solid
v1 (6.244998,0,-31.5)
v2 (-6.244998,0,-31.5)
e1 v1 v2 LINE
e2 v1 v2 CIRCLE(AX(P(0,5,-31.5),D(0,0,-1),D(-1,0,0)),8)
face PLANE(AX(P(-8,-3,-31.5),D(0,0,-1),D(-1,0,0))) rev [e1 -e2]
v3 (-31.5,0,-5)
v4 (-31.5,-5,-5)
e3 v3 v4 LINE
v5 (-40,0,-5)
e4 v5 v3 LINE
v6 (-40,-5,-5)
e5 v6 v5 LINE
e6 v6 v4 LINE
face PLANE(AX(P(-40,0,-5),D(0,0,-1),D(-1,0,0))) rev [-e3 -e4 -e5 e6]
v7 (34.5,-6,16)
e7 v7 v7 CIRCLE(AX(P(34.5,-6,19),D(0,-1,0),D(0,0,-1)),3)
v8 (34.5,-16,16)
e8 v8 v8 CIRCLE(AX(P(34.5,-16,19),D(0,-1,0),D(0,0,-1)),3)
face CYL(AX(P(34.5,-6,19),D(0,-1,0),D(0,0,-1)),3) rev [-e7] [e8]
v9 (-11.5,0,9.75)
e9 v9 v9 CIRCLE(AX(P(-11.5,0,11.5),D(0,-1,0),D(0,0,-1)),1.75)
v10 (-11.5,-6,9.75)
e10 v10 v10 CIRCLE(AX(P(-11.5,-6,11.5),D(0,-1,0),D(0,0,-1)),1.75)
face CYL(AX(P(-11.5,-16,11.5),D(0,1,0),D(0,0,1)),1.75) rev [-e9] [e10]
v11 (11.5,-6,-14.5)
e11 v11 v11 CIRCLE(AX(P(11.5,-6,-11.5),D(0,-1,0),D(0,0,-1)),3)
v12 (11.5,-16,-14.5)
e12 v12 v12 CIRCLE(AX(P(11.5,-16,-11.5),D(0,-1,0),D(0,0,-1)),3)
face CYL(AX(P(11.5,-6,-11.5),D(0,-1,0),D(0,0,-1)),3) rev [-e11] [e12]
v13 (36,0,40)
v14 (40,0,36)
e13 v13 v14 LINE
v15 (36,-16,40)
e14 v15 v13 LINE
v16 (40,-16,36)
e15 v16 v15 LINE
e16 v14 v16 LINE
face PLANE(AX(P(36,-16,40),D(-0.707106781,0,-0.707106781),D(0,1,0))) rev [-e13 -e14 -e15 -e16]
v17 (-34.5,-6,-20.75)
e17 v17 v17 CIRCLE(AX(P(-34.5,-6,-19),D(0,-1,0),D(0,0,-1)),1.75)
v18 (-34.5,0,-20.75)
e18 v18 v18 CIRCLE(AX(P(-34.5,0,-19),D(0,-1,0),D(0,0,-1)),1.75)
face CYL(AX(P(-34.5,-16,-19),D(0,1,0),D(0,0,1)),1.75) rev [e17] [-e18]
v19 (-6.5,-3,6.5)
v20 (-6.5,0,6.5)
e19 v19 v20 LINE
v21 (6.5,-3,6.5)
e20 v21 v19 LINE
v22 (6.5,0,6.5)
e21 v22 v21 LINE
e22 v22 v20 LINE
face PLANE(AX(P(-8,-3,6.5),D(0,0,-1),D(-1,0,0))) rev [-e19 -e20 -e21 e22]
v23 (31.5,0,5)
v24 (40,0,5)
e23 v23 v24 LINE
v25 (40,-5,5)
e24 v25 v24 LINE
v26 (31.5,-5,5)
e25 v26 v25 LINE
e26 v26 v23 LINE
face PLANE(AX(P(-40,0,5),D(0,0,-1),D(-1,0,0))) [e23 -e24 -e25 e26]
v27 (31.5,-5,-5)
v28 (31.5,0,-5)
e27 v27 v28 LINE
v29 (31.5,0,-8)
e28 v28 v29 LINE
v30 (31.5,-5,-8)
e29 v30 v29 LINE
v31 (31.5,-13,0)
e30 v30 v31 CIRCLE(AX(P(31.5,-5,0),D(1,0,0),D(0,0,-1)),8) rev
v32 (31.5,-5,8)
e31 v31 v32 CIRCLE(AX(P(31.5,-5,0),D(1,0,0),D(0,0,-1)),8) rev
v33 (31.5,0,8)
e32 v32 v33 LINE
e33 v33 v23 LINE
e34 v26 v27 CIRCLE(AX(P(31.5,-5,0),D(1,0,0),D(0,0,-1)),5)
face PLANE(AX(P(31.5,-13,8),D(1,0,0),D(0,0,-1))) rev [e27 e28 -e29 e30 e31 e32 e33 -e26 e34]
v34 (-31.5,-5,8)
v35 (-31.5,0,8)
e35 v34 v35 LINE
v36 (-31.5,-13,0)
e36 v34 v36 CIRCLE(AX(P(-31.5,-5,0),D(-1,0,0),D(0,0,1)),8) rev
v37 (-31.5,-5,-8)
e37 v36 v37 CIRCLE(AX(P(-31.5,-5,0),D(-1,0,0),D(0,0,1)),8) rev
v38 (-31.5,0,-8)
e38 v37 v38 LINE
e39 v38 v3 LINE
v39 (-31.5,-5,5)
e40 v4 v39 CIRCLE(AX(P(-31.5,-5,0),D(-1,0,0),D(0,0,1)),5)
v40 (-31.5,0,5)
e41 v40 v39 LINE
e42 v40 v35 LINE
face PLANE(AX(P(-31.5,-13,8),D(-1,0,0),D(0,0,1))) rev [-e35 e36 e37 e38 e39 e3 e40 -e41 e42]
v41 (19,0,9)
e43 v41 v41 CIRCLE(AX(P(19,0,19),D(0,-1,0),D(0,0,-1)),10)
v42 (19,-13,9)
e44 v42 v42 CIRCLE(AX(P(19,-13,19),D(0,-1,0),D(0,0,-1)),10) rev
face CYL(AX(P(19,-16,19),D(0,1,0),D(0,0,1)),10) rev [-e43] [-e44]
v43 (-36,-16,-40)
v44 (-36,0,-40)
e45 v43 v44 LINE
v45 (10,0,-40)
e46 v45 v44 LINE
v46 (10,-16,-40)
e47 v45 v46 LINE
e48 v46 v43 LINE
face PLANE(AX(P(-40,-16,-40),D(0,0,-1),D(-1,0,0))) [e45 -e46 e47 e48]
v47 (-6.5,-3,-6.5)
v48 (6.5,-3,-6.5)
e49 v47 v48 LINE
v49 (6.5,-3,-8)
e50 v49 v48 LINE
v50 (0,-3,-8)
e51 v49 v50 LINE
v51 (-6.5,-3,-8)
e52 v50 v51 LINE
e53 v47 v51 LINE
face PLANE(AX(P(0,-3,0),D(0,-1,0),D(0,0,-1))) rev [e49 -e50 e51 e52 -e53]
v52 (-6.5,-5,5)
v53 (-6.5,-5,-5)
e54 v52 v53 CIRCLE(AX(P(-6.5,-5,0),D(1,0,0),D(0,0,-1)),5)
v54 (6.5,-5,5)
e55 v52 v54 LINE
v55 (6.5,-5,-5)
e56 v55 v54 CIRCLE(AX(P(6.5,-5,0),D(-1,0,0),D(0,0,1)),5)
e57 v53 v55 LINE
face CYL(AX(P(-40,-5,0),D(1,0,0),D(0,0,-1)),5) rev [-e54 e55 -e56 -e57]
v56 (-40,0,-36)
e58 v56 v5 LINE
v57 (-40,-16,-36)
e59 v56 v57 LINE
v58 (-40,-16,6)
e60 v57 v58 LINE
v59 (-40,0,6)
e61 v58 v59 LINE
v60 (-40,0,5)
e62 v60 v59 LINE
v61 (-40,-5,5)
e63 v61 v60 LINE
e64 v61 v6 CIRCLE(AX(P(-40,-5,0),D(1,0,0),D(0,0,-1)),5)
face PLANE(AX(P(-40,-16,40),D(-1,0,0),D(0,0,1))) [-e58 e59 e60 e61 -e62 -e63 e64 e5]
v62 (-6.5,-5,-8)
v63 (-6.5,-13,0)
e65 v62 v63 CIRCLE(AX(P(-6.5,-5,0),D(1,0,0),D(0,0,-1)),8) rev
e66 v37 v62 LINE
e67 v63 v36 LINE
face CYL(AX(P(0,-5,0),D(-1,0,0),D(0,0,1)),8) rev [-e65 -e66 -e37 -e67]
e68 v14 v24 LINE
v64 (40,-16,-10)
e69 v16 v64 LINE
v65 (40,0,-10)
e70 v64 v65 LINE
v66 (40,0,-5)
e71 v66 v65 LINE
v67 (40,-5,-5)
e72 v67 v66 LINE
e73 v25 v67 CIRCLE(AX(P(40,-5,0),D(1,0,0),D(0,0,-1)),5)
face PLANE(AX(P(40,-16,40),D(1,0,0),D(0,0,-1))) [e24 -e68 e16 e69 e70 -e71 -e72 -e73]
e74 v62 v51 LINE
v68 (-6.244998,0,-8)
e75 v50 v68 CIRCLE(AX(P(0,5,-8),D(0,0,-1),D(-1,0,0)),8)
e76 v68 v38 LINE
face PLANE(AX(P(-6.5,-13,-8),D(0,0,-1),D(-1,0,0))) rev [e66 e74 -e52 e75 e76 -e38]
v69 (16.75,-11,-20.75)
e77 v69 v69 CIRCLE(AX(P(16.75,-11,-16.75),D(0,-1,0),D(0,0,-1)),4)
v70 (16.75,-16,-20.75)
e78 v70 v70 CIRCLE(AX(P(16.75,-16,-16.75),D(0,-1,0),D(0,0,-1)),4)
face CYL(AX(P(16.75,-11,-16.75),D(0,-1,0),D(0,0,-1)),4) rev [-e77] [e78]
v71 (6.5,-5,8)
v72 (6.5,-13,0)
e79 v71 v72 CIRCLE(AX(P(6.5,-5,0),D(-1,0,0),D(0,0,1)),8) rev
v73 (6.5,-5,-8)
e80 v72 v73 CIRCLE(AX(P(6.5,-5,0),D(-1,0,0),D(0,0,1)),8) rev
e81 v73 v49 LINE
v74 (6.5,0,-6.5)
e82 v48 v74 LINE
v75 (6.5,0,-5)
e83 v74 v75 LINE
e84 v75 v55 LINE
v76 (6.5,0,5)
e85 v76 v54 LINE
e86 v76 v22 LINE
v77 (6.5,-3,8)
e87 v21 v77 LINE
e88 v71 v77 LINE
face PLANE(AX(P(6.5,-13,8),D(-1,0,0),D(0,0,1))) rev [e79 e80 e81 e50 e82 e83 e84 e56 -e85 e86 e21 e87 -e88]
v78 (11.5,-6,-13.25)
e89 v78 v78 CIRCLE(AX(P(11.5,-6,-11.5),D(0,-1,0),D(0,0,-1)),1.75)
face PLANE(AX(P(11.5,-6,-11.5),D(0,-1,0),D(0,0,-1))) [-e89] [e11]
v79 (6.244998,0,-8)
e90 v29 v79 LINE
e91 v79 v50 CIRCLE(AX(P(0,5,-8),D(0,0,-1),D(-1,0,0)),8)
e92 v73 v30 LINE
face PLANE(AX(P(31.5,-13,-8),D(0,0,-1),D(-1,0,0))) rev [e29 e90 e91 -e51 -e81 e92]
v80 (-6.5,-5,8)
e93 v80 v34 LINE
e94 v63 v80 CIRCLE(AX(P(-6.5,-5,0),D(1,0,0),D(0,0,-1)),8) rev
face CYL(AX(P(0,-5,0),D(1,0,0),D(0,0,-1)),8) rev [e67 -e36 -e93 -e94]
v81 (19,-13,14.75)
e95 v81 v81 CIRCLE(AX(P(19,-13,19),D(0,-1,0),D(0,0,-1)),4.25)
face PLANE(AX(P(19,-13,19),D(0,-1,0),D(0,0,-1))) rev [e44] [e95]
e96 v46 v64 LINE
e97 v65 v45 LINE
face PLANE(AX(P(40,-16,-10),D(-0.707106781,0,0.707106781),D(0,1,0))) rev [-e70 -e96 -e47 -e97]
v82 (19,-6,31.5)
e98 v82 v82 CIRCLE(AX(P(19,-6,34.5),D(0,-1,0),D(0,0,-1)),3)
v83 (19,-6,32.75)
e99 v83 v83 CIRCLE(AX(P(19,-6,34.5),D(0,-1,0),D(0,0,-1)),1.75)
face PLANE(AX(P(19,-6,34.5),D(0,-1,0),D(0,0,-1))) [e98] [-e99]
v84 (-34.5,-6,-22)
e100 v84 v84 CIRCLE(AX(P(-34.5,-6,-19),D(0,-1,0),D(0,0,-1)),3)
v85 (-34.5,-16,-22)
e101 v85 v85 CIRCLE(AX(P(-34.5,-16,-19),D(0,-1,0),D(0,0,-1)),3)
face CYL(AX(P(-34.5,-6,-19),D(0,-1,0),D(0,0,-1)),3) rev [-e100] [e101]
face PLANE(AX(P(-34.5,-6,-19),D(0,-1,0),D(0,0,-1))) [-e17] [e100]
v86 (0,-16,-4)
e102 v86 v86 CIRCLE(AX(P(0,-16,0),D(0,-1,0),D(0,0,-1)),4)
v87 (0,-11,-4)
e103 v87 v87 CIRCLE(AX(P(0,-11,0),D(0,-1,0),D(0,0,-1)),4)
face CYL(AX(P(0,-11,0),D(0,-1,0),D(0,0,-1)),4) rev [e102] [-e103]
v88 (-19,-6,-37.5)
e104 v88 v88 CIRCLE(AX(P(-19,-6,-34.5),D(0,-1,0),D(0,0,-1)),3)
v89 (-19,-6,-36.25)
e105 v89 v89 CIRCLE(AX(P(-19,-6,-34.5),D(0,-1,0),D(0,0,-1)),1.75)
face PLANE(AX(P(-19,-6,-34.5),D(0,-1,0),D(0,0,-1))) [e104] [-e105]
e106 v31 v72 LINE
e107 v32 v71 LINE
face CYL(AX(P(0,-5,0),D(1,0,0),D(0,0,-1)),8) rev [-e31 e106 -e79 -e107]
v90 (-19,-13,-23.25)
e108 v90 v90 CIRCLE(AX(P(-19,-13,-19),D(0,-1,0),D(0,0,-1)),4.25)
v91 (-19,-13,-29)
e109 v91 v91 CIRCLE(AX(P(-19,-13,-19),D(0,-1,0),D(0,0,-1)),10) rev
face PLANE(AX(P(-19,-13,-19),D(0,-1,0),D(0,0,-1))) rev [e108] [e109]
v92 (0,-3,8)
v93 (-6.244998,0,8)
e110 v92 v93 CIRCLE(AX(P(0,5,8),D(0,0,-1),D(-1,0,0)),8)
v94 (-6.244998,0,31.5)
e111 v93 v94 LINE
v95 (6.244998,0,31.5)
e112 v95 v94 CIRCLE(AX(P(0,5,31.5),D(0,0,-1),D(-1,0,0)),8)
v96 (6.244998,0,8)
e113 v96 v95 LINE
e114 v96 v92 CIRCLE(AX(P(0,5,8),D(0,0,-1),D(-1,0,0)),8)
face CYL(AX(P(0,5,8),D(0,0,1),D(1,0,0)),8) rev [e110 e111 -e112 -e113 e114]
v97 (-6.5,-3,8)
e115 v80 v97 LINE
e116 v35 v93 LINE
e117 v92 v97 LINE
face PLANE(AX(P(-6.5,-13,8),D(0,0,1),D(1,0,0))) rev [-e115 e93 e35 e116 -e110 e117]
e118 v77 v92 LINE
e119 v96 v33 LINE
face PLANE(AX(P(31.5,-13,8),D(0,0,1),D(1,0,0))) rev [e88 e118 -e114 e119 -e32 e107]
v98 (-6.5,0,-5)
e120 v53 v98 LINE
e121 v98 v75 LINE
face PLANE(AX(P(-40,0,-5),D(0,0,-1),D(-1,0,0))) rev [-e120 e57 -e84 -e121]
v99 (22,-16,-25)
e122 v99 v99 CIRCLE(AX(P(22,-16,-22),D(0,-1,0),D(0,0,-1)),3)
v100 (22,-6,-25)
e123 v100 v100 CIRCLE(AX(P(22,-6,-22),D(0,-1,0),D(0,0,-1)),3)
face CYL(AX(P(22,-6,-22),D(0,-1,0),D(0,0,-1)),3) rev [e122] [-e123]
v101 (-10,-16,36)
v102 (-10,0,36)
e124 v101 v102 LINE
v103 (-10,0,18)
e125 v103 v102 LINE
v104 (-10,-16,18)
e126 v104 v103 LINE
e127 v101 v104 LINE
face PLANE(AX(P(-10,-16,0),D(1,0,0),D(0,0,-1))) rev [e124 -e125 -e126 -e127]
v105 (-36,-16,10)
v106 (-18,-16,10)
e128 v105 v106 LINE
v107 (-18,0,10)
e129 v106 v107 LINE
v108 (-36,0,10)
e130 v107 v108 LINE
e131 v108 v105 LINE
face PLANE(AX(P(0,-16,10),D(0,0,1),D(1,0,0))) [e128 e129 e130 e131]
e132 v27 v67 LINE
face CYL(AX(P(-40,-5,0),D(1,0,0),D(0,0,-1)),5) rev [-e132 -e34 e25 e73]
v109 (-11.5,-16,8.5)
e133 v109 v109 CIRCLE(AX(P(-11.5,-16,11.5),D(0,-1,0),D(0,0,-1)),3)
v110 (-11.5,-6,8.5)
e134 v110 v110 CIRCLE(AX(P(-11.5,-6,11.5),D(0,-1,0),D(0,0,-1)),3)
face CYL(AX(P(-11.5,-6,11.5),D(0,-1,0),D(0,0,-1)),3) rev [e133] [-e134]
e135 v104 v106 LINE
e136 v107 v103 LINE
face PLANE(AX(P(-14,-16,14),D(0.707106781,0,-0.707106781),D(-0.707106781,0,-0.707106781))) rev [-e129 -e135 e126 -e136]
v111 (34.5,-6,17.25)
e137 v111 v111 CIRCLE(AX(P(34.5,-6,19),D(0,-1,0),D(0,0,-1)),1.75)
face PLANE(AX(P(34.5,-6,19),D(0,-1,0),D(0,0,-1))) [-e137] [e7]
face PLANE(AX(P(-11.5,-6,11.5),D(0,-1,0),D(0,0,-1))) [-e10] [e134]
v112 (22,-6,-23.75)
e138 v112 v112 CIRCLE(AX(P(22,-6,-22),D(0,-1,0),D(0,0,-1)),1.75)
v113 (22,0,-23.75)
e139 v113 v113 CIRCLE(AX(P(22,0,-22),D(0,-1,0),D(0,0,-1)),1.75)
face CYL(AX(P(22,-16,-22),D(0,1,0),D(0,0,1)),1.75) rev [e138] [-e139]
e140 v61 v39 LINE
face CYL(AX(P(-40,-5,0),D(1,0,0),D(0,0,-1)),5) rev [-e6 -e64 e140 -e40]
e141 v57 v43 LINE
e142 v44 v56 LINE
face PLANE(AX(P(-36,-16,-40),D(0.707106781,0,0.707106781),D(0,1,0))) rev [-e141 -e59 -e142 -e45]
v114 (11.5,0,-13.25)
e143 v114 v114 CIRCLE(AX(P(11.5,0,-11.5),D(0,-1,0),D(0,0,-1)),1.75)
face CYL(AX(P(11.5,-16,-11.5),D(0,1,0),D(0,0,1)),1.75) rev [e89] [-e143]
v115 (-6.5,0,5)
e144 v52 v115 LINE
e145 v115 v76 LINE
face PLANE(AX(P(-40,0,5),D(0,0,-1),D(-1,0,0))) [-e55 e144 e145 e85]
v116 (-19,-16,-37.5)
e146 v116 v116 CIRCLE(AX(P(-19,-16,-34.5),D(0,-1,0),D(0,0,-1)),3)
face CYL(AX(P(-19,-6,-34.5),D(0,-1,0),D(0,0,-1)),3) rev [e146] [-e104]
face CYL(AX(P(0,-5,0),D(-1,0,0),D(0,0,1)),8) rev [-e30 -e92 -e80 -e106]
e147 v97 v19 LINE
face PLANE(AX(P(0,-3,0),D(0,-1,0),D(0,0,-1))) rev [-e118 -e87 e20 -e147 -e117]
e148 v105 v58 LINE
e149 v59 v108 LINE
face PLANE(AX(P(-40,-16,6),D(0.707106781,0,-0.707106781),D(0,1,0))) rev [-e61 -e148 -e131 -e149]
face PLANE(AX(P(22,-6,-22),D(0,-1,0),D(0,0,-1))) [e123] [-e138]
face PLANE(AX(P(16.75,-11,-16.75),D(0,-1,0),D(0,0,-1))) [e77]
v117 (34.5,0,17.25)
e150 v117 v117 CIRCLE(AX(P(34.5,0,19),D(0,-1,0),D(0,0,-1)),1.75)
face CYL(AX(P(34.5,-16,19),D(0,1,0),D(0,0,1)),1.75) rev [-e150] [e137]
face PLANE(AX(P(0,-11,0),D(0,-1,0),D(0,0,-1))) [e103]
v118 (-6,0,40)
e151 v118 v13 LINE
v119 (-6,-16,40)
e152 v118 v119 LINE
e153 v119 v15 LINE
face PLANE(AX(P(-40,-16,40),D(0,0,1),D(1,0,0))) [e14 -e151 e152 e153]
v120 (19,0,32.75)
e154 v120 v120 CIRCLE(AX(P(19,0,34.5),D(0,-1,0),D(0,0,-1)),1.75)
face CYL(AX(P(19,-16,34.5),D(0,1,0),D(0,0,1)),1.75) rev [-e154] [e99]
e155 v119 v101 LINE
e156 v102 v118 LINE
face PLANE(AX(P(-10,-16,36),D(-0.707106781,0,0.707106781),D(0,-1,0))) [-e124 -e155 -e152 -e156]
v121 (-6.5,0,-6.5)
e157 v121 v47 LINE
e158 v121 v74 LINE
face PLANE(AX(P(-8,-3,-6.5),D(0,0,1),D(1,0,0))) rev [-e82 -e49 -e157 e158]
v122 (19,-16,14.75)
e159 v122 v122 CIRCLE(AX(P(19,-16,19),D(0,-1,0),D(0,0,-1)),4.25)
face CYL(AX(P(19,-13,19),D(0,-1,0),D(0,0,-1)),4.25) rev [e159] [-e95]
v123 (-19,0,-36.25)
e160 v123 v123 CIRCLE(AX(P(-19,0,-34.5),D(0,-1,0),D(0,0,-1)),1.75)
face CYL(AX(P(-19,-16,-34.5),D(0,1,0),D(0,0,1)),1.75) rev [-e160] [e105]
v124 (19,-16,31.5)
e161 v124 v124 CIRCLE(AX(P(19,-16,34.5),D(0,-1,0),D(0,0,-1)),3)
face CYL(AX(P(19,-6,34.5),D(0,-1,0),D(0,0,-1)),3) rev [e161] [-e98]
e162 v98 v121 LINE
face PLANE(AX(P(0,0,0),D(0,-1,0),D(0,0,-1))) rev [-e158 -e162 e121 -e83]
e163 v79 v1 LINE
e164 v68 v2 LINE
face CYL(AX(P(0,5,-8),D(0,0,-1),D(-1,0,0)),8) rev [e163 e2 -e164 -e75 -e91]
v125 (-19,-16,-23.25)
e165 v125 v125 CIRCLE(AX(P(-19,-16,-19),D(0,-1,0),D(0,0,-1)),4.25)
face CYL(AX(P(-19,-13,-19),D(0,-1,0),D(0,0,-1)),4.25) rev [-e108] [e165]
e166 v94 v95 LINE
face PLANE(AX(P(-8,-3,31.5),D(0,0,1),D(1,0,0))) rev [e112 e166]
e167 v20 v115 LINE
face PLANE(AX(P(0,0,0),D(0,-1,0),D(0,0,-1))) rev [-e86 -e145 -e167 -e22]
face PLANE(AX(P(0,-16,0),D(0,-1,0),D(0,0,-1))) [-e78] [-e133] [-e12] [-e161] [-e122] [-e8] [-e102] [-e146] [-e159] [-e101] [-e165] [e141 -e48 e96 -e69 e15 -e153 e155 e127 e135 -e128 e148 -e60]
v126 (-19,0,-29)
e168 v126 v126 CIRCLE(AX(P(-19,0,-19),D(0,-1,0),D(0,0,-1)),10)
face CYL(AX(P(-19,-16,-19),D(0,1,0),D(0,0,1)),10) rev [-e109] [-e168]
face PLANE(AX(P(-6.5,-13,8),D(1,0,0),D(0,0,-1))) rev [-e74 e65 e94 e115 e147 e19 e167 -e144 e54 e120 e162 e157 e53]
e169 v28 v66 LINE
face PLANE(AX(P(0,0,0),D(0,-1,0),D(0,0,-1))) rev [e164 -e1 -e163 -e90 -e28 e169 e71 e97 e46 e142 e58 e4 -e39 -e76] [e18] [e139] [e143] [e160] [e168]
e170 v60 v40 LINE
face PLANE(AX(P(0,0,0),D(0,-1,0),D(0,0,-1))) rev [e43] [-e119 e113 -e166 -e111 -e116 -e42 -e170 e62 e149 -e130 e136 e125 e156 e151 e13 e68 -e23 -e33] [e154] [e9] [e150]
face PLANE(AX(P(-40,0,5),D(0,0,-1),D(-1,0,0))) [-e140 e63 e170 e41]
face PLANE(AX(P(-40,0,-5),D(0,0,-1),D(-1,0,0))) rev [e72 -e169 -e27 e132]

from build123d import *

# Parameters (mm, degrees)
SKETCH1_W               = 80
SKETCH1_H               = 80
BOSS_EXTRUDE1_DEPTH     = 16
CUT_EXTRUDE1_DEPTH      = 59.787753827
CUT_EXTRUDE1_DEPTH_BACK = 59.787753827
SKETCH2_R               = 1.75
SKETCH3_W               = 25
SKETCH3_H               = 16
CUT_EXTRUDE2_DEPTH      = 13
FILLET1_R               = 8
SKETCH4_W               = 16
SKETCH4_H               = 25
CUT_EXTRUDE3_DEPTH      = 3
BOSS_EXTRUDE2_DEPTH     = 23.5
CUT_EXTRUDE4_DEPTH      = 59.787753827
CUT_EXTRUDE4_DEPTH_BACK = 59.787753827
CUT_EXTRUDE5_DEPTH      = 59.787753827
CUT_EXTRUDE5_DEPTH_BACK = 59.787753827
SKETCH7_R               = 10
CUT_EXTRUDE6_DEPTH      = 59.787753827
CUT_EXTRUDE6_DEPTH_BACK = 59.787753827
CHAMFER1_SIZE           = 4
CHAMFER2_SIZE           = 30
BOSS_EXTRUDE4_START     = -3
SKETCH11_R              = 10
SKETCH11_R_2            = 4.25
BOSS_EXTRUDE4_DEPTH     = 3
SKETCH12_R              = 4
CUT_EXTRUDE7_DEPTH      = 5
CUT_EXTRUDE8_START      = -10
SKETCH13_R              = 3
SKETCH13_R_2            = 1.75
CUT_EXTRUDE8_DEPTH      = 10


with BuildPart() as part:
    # Sketch1 → Boss-Extrude1 (new body)
    with BuildSketch(Plane(origin=(0, 0, 0), x_dir=(1, 0, 0), z_dir=(0, 1, 0))):
        Rectangle(SKETCH1_W, SKETCH1_H)
    extrude(amount=-BOSS_EXTRUDE1_DEPTH)

    # Sketch2 → Cut-Extrude1 (cut, two sides: drawn at the far end of the back side and taken through both)
    with BuildSketch(Plane(origin=(0, 0, 0), x_dir=(1, 0, 0), z_dir=(0, 1, 0)).offset(-CUT_EXTRUDE1_DEPTH_BACK)):
        with Locations(Location((-11.5, -11.5, 0), (0, 0, 270))):
            Circle(SKETCH2_R)
        with Locations(Location((11.5, 11.5, 0), (0, 0, 270))):
            Circle(SKETCH2_R)
        with Locations(Location((22, 22, 0), (0, 0, 270))):
            Circle(SKETCH2_R)
        with Locations(Location((19, -34.5, 0), (0, 0, 270))):
            Circle(SKETCH2_R)
        with Locations(Location((34.5, -19, 0), (0, 0, 270))):
            Circle(SKETCH2_R)
        with Locations(Location((-34.5, 19, 0), (0, 0, 270))):
            Circle(SKETCH2_R)
        with Locations(Location((-19, 34.5, 0), (0, 0, 270))):
            Circle(SKETCH2_R)
    extrude(amount=CUT_EXTRUDE1_DEPTH + CUT_EXTRUDE1_DEPTH_BACK, mode=Mode.SUBTRACT)

    # Sketch3 → Cut-Extrude2 (cut)
    with BuildSketch(Plane(origin=(0, 0, 0), x_dir=(1, 0, 0), z_dir=(0, 1, 0))):
        with Locations((19, 0)):
            Rectangle(SKETCH3_W, SKETCH3_H)
        with Locations((-19, 0)):
            Rectangle(SKETCH3_W, SKETCH3_H)
    extrude(amount=-CUT_EXTRUDE2_DEPTH, mode=Mode.SUBTRACT)

    # Fillet1
    fillet1_edges = [part.edges().sort_by_distance(p)[0] for p in [
        (19, -13, 8),
        (19, -13, -8),
        (-19, -13, 8),
        (-19, -13, -8),
    ]]
    fillet(fillet1_edges, radius=FILLET1_R - 0.0001)  # a hair under: the kernel refuses the full size

    # Sketch4 → Cut-Extrude3 (cut)
    with BuildSketch(Plane(origin=(0, 0, 0), x_dir=(1, 0, 0), z_dir=(0, 1, 0))):
        with Locations((0, -19)):
            Rectangle(SKETCH4_W, SKETCH4_H)
        with Locations((0, 19)):
            Rectangle(SKETCH4_W, SKETCH4_H)
    extrude(amount=-CUT_EXTRUDE3_DEPTH, mode=Mode.SUBTRACT)

    # Sketch5 → Boss-Extrude2 (add)
    with BuildSketch(Plane(origin=(0, 0, 31.5), x_dir=(-1, 0, 0), z_dir=(0, 0, -1))):
        with BuildLine():
            ThreePointArc((1.5e-08, -3), (-3.464101608, -2.211102554), (-6.244997998, 0))
            Line((-6.244997998, 0), (-8, 0))
            Line((-8, 0), (-8, -3))
            Line((-8, -3), (1.5e-08, -3))
        make_face()
        with BuildLine():
            Line((8, -3), (8, 0))
            Line((8, 0), (6.244997998, 0))
            ThreePointArc((6.244997998, 0), (3.464101622, -2.211102548), (1.5e-08, -3))
            Line((1.5e-08, -3), (8, -3))
        make_face()
    boss_extrude2 = extrude(amount=BOSS_EXTRUDE2_DEPTH)

    # Mirror1: Boss-Extrude2 across plane
    add(boss_extrude2.mirror(Plane.XY))

    # Sketch6 → Cut-Extrude4 (cut, two sides: drawn at the far end of the back side and taken through both)
    with BuildSketch(Plane(origin=(0, 0, 0), x_dir=(0, 0, -1), z_dir=(1, 0, 0)).offset(-CUT_EXTRUDE4_DEPTH_BACK)):
        with BuildLine():
            ThreePointArc((-5, -5), (0, -10), (5, -5))
            Line((5, -5), (-5, -5))
        make_face()
        with BuildLine():
            Line((-5, -5), (5, -5))
            ThreePointArc((5, -5), (3.535533906, -1.464466094), (0, 0))
            ThreePointArc((0, 0), (-3.535533906, -1.464466094), (-5, -5))
        make_face()
        with BuildLine():
            Line((-5, 0), (-5, -5))
            ThreePointArc((-5, -5), (-3.535533906, -1.464466094), (0, 0))
            Line((0, 0), (-5, 0))
        make_face()
        with BuildLine():
            ThreePointArc((0, 0), (3.535533906, -1.464466094), (5, -5))
            Line((5, -5), (5, 0))
            Line((5, 0), (0, 0))
        make_face()
    extrude(amount=CUT_EXTRUDE4_DEPTH + CUT_EXTRUDE4_DEPTH_BACK, mode=Mode.SUBTRACT)

    # Sketch7 → Cut-Extrude5 (cut, two sides: drawn at the far end of the back side and taken through both)
    with BuildSketch(Plane(origin=(0, 0, 0), x_dir=(1, 0, 0), z_dir=(0, 1, 0)).offset(-CUT_EXTRUDE5_DEPTH_BACK)):
        with Locations(Location((19, -19, 0), (0, 0, 270))):
            Circle(SKETCH7_R)
        with Locations(Location((-19, 19, 0), (0, 0, 270))):
            Circle(SKETCH7_R)
    extrude(amount=CUT_EXTRUDE5_DEPTH + CUT_EXTRUDE5_DEPTH_BACK, mode=Mode.SUBTRACT)

    # Sketch9 → Cut-Extrude6 (cut, two sides: drawn at the far end of the back side and taken through both)
    with BuildSketch(Plane(origin=(0, 0, 0), x_dir=(1, 0, 0), z_dir=(0, 1, 0)).offset(-CUT_EXTRUDE6_DEPTH_BACK)):
        Polygon((-10, -18), (-18, -10), (-18, -18), align=None)
        Polygon((-10, -40), (-10, -18), (-18, -18), (-18, -10), (-40, -10), (-40, -40), align=None)
    extrude(amount=CUT_EXTRUDE6_DEPTH + CUT_EXTRUDE6_DEPTH_BACK, mode=Mode.SUBTRACT)

    # Chamfer1
    chamfer1_edges = [part.edges().sort_by_distance(p)[0] for p in [
        (-10, -8, 40),
        (-40, -8, 10),
        (40, -8, 40),
        (-40, -8, -40),
    ]]
    chamfer(chamfer1_edges, length=CHAMFER1_SIZE)

    # Chamfer2
    chamfer2_edges = [part.edges().sort_by_distance(p)[0] for p in [
        (40, -8, -40),
    ]]
    chamfer(chamfer2_edges, length=CHAMFER2_SIZE)

    # Sketch11 → Boss-Extrude4 (add)
    # profile 1 of 2: a face of its own
    with BuildSketch(Plane.XZ.offset(16).offset(BOSS_EXTRUDE4_START)):
        with Locations(Location((-19, -19, 0), (0, 0, 270))):
            Circle(SKETCH11_R)
        with Locations(Location((-19, -19, 0), (0, 0, 270))):
            Circle(SKETCH11_R_2, mode=Mode.SUBTRACT)
    # profile 2 of 2: a face of its own
    with BuildSketch(Plane.XZ.offset(16).offset(BOSS_EXTRUDE4_START)):
        with Locations(Location((19, 19, 0), (0, 0, 270))):
            Circle(SKETCH11_R)
        with Locations(Location((19, 19, 0), (0, 0, 270))):
            Circle(SKETCH11_R_2, mode=Mode.SUBTRACT)
    extrude(amount=BOSS_EXTRUDE4_DEPTH)

    # Sketch12 → Cut-Extrude7 (cut)
    with BuildSketch(Plane.XZ.offset(16)):
        with Locations(Location((0, 0, 0), (0, 0, 270))):
            Circle(SKETCH12_R)
        with Locations(Location((16.75, -16.75, 0), (0, 0, 270))):
            Circle(SKETCH12_R)
    extrude(amount=-CUT_EXTRUDE7_DEPTH, mode=Mode.SUBTRACT)

    # Sketch13 → Cut-Extrude8 (cut)
    # profile 1 of 7: a face of its own
    with BuildSketch(Plane.XZ.offset(16).offset(CUT_EXTRUDE8_START)):
        with Locations(Location((19, 34.5, 0), (0, 0, 270))):
            Circle(SKETCH13_R)
        with Locations(Location((19, 34.5, 0), (0, 0, 270))):
            Circle(SKETCH13_R_2, mode=Mode.SUBTRACT)
    # profile 2 of 7: a face of its own
    with BuildSketch(Plane.XZ.offset(16).offset(CUT_EXTRUDE8_START)):
        with Locations(Location((34.5, 19, 0), (0, 0, 270))):
            Circle(SKETCH13_R)
        with Locations(Location((34.5, 19, 0), (0, 0, 270))):
            Circle(SKETCH13_R_2, mode=Mode.SUBTRACT)
    # profile 3 of 7: a face of its own
    with BuildSketch(Plane.XZ.offset(16).offset(CUT_EXTRUDE8_START)):
        with Locations(Location((-11.5, 11.5, 0), (0, 0, 270))):
            Circle(SKETCH13_R)
        with Locations(Location((-11.5, 11.5, 0), (0, 0, 270))):
            Circle(SKETCH13_R_2, mode=Mode.SUBTRACT)
    # profile 4 of 7: a face of its own
    with BuildSketch(Plane.XZ.offset(16).offset(CUT_EXTRUDE8_START)):
        with Locations(Location((-34.5, -19, 0), (0, 0, 270))):
            Circle(SKETCH13_R)
        with Locations(Location((-34.5, -19, 0), (0, 0, 270))):
            Circle(SKETCH13_R_2, mode=Mode.SUBTRACT)
    # profile 5 of 7: a face of its own
    with BuildSketch(Plane.XZ.offset(16).offset(CUT_EXTRUDE8_START)):
        with Locations(Location((-19, -34.5, 0), (0, 0, 270))):
            Circle(SKETCH13_R)
        with Locations(Location((-19, -34.5, 0), (0, 0, 270))):
            Circle(SKETCH13_R_2, mode=Mode.SUBTRACT)
    # profile 6 of 7: a face of its own
    with BuildSketch(Plane.XZ.offset(16).offset(CUT_EXTRUDE8_START)):
        with Locations(Location((11.5, -11.5, 0), (0, 0, 270))):
            Circle(SKETCH13_R)
        with Locations(Location((11.5, -11.5, 0), (0, 0, 270))):
            Circle(SKETCH13_R_2, mode=Mode.SUBTRACT)
    # profile 7 of 7: a face of its own
    with BuildSketch(Plane.XZ.offset(16).offset(CUT_EXTRUDE8_START)):
        with Locations(Location((22, -22, 0), (0, 0, 270))):
            Circle(SKETCH13_R)
        with Locations(Location((22, -22, 0), (0, 0, 270))):
            Circle(SKETCH13_R_2, mode=Mode.SUBTRACT)
    extrude(amount=CUT_EXTRUDE8_DEPTH, mode=Mode.SUBTRACT)


solid = part.part
